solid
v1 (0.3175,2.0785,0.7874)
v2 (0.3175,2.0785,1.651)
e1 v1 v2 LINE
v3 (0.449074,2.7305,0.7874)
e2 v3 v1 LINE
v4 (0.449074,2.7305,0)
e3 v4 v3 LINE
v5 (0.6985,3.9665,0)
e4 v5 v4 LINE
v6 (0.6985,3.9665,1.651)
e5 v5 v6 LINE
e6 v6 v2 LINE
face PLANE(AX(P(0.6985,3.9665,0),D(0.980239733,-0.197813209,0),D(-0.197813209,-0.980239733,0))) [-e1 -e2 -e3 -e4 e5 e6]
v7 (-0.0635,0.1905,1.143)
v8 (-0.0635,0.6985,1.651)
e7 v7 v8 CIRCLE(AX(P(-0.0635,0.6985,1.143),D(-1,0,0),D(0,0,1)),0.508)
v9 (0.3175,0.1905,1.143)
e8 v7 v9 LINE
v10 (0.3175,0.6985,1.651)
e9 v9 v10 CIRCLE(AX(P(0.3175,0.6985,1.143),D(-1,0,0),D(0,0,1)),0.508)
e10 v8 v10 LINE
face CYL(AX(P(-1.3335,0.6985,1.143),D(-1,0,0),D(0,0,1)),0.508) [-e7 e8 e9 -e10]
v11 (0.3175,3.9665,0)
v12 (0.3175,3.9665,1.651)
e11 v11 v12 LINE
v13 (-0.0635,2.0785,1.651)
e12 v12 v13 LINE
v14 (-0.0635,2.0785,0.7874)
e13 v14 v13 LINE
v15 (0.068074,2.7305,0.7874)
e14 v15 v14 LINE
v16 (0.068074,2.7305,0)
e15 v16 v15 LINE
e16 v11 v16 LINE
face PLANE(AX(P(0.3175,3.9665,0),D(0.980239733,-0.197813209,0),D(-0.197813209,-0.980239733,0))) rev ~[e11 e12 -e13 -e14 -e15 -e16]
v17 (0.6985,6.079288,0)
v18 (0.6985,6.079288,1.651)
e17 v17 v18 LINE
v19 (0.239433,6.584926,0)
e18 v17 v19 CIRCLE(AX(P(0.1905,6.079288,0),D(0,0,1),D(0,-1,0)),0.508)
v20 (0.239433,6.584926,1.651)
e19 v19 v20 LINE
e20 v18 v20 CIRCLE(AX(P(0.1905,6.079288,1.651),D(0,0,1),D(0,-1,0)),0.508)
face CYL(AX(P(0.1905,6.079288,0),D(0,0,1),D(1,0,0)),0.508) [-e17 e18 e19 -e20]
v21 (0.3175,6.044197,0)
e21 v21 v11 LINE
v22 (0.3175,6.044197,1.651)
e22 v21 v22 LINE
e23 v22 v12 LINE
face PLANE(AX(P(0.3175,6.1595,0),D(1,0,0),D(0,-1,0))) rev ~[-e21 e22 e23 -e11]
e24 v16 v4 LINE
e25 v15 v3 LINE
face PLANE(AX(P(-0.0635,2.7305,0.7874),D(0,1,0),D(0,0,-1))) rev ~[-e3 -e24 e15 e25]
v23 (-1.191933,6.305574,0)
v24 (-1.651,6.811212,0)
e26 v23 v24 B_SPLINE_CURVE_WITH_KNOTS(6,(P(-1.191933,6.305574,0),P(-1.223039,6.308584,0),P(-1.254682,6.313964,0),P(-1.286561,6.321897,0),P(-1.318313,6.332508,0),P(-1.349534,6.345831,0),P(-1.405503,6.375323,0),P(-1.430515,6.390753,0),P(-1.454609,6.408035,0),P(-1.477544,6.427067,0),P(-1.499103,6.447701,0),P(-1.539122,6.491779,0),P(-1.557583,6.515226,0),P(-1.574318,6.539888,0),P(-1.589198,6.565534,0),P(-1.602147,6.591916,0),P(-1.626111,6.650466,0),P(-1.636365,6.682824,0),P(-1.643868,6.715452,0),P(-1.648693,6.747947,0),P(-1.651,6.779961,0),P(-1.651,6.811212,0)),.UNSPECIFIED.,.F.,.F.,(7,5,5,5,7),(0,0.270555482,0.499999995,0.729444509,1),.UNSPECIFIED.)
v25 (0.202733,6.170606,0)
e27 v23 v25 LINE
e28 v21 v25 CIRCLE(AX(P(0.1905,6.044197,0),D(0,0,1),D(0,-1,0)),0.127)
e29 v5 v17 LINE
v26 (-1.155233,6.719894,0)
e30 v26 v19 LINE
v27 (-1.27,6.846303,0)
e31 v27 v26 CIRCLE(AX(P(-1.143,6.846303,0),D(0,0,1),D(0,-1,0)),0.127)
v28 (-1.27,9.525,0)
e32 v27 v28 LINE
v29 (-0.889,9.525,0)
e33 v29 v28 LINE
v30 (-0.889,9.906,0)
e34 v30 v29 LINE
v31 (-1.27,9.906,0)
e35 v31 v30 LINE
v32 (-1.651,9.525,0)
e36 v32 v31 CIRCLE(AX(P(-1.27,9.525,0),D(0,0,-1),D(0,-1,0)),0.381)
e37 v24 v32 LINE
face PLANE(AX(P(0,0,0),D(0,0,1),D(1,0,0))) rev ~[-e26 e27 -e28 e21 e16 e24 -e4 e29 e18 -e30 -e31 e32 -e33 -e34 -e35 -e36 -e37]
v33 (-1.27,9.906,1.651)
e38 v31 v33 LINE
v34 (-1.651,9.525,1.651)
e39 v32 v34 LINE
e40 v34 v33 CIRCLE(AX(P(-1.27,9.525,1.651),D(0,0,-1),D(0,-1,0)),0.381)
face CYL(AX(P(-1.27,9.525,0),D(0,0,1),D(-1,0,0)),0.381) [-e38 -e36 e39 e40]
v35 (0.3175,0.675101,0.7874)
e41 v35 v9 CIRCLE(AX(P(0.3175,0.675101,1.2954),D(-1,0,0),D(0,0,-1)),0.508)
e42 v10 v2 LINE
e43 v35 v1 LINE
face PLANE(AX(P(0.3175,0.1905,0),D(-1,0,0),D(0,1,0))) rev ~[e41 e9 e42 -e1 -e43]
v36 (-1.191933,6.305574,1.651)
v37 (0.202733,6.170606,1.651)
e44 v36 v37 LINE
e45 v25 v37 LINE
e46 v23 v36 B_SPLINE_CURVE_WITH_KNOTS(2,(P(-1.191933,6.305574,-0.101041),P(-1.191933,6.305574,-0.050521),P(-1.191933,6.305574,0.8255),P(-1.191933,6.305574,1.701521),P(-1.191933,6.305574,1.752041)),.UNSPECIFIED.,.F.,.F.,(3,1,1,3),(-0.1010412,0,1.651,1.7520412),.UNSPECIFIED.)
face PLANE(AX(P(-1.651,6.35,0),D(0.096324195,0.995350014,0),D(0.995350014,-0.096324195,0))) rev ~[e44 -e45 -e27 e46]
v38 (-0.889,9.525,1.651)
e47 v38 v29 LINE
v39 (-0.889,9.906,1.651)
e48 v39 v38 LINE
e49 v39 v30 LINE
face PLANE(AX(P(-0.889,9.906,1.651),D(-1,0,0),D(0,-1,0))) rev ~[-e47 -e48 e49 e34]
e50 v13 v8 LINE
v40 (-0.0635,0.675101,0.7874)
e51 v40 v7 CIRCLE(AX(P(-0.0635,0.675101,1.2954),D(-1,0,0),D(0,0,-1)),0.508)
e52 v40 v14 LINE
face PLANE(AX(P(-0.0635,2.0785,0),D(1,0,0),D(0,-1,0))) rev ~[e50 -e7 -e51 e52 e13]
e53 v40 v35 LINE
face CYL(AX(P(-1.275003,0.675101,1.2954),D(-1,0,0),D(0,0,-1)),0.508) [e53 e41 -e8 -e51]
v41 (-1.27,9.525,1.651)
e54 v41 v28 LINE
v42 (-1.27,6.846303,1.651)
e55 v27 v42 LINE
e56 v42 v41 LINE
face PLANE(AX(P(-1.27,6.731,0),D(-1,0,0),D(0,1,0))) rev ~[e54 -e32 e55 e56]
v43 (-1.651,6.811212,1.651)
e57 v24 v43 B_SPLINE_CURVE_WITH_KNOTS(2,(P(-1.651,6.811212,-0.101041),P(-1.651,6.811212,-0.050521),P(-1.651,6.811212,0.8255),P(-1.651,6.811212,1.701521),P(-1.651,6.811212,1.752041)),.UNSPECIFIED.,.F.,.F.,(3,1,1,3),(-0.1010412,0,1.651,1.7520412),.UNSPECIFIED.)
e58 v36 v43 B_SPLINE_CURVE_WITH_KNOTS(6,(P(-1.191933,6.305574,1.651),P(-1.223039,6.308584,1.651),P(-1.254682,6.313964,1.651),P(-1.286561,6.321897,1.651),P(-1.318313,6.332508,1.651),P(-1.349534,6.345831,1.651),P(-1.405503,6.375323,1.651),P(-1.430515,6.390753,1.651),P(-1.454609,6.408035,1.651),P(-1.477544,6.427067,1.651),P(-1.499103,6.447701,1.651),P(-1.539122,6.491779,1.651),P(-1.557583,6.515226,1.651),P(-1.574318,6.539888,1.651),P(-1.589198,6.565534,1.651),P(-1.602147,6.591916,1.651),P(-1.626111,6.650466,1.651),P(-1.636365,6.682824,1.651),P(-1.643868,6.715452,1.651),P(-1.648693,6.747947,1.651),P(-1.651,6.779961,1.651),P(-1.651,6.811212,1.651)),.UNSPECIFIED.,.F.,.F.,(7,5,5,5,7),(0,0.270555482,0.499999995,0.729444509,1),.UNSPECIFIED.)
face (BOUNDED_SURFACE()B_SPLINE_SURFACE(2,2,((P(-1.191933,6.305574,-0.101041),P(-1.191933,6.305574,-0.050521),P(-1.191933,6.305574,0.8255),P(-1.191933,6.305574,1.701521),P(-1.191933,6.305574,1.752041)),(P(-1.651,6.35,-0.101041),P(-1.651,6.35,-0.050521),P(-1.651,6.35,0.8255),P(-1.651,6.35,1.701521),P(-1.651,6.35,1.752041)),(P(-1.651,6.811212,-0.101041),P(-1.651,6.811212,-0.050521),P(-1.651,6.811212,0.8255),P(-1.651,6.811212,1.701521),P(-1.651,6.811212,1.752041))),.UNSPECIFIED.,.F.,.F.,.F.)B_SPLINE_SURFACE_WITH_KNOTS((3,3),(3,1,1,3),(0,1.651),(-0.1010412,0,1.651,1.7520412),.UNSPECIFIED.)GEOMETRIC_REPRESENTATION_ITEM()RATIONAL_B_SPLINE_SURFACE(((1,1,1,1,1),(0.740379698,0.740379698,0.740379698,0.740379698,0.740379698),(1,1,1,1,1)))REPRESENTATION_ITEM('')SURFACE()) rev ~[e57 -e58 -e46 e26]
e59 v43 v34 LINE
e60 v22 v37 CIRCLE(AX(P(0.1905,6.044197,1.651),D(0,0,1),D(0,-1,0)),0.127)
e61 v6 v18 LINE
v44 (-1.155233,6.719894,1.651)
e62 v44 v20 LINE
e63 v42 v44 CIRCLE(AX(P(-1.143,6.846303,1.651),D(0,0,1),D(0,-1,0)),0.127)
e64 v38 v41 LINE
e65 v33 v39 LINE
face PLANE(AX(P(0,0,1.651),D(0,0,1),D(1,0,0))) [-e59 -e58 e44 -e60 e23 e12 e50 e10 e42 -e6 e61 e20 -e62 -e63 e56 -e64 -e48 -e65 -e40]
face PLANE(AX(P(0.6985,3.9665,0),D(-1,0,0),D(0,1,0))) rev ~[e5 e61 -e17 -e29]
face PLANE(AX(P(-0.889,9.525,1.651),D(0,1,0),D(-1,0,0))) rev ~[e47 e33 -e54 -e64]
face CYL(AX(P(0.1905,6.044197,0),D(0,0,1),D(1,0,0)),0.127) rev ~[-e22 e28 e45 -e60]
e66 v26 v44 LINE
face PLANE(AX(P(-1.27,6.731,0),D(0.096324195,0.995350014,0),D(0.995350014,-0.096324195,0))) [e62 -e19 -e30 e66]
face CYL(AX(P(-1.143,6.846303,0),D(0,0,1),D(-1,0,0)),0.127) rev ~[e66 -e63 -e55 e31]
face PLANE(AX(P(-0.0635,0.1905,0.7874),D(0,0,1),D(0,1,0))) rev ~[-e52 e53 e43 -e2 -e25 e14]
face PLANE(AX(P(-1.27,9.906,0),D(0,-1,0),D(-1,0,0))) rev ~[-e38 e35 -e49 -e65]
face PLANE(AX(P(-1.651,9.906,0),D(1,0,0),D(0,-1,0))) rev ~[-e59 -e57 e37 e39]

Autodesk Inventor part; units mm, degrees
ref_plane "YZ Plane" through (0, 0, 0) normal (1, 0, 0) x (0, 1, 0)
ref_plane "XZ Plane" through (0, 0, 0) normal (0, 1, 0) x (-1, 0, 0)
ref_plane "XY Plane" through (0, 0, 0) normal (0, 0, 1) x (1, 0, 0)
sketch "Sketch1" plane through (0, 0, 0) normal (0, 0, 1) x (1, 0, 0)
  line L0 (0.6985, 3.9665) -> (0.6985, 6.5405)
  line L1 (0.3175, 6.1595) -> (0.3175, 3.9665)
  line L2 (-1.651, 6.35) -> (-1.651, 6.731)
  line L3 (-1.27, 6.731) -> (-1.27, 9.906)
  line L4 (-1.27, 9.906) -> (-1.651, 9.906)
  line L5 (-1.651, 9.906) -> (-1.651, 6.35)
  line L6 (-0.0635, 2.0785) -> (-0.0635, 0.1905)
  line L7 (-0.0635, 0.1905) -> (0.3175, 0.1905)
  line L8 (0.3175, 0.1905) -> (0.3175, 2.0785)
  line L9 (0.6985, 3.9665) -> (0.3175, 2.0785)
  line L10 (0.3175, 3.9665) -> (-0.0635, 2.0785)
  line L11 (-1.27, 6.731) -> (0.6985, 6.5405)
  line L12 (-1.651, 6.35) -> (0.3175, 6.1595)
  point P0 (0, 0)
  dimension "d3" = 0.381
  dimension "d4" = 0.381
extrude "Extrusion1" add sketch "Sketch1" along normal blind 1.651
fillet "Fillet1" radius 0.127 2 edges at (0.3175, 6.1595, 0.8255) (-1.27, 6.731, 0.8255)
fillet "Fillet2" radius 0.508 2 edges at (-1.651, 6.35, 0.8255) (0.6985, 6.5405, 0.8255)
fillet_without_effect "Fillet3"
sketch "Sketch3" plane through (-0.0635, 0.1905, 0) normal (-1, 0, 0) x (0, 0, 1)
  line L0 (0, 0) -> (0.7874, 0)
  line L1 (0.7874, 0) -> (0.7874, 2.54)
  line L2 (0.7874, 2.54) -> (0, 2.54)
  line L3 (0, 2.54) -> (0, 0)
  point P0 (0, -0.1905)
  dimension "d18" = 0.7874
  dimension "d19" = 2.54
extrude "Extrusion3" cut sketch "Sketch3" against normal through all
sketch "Sketch4" plane through (0, 0, 1.651) normal (0, 0, 1) x (1, 0, 0)
  line L0 (-1.651, 9.906) -> (-0.889, 9.906)
  line L1 (-0.889, 9.906) -> (-0.889, 9.525)
  line L2 (-0.889, 9.525) -> (-1.651, 9.525)
  line L3 (-1.651, 9.525) -> (-1.651, 9.906)
  point P0 (0, 0)
  dimension "d22" = 0.762
  dimension "d23" = 0.381
extrude "Extrusion4" add sketch "Sketch4" against normal blind 1.651
fillet "Fillet4" radius 0.381 1 edges at (-1.651, 9.906, 0.8255)
fillet "Fillet5" radius 0.508 2 edges at (0.127, 0.1905, 1.651) (0.127, 0.1905, 0.7874)
properties part number "pin_1"
